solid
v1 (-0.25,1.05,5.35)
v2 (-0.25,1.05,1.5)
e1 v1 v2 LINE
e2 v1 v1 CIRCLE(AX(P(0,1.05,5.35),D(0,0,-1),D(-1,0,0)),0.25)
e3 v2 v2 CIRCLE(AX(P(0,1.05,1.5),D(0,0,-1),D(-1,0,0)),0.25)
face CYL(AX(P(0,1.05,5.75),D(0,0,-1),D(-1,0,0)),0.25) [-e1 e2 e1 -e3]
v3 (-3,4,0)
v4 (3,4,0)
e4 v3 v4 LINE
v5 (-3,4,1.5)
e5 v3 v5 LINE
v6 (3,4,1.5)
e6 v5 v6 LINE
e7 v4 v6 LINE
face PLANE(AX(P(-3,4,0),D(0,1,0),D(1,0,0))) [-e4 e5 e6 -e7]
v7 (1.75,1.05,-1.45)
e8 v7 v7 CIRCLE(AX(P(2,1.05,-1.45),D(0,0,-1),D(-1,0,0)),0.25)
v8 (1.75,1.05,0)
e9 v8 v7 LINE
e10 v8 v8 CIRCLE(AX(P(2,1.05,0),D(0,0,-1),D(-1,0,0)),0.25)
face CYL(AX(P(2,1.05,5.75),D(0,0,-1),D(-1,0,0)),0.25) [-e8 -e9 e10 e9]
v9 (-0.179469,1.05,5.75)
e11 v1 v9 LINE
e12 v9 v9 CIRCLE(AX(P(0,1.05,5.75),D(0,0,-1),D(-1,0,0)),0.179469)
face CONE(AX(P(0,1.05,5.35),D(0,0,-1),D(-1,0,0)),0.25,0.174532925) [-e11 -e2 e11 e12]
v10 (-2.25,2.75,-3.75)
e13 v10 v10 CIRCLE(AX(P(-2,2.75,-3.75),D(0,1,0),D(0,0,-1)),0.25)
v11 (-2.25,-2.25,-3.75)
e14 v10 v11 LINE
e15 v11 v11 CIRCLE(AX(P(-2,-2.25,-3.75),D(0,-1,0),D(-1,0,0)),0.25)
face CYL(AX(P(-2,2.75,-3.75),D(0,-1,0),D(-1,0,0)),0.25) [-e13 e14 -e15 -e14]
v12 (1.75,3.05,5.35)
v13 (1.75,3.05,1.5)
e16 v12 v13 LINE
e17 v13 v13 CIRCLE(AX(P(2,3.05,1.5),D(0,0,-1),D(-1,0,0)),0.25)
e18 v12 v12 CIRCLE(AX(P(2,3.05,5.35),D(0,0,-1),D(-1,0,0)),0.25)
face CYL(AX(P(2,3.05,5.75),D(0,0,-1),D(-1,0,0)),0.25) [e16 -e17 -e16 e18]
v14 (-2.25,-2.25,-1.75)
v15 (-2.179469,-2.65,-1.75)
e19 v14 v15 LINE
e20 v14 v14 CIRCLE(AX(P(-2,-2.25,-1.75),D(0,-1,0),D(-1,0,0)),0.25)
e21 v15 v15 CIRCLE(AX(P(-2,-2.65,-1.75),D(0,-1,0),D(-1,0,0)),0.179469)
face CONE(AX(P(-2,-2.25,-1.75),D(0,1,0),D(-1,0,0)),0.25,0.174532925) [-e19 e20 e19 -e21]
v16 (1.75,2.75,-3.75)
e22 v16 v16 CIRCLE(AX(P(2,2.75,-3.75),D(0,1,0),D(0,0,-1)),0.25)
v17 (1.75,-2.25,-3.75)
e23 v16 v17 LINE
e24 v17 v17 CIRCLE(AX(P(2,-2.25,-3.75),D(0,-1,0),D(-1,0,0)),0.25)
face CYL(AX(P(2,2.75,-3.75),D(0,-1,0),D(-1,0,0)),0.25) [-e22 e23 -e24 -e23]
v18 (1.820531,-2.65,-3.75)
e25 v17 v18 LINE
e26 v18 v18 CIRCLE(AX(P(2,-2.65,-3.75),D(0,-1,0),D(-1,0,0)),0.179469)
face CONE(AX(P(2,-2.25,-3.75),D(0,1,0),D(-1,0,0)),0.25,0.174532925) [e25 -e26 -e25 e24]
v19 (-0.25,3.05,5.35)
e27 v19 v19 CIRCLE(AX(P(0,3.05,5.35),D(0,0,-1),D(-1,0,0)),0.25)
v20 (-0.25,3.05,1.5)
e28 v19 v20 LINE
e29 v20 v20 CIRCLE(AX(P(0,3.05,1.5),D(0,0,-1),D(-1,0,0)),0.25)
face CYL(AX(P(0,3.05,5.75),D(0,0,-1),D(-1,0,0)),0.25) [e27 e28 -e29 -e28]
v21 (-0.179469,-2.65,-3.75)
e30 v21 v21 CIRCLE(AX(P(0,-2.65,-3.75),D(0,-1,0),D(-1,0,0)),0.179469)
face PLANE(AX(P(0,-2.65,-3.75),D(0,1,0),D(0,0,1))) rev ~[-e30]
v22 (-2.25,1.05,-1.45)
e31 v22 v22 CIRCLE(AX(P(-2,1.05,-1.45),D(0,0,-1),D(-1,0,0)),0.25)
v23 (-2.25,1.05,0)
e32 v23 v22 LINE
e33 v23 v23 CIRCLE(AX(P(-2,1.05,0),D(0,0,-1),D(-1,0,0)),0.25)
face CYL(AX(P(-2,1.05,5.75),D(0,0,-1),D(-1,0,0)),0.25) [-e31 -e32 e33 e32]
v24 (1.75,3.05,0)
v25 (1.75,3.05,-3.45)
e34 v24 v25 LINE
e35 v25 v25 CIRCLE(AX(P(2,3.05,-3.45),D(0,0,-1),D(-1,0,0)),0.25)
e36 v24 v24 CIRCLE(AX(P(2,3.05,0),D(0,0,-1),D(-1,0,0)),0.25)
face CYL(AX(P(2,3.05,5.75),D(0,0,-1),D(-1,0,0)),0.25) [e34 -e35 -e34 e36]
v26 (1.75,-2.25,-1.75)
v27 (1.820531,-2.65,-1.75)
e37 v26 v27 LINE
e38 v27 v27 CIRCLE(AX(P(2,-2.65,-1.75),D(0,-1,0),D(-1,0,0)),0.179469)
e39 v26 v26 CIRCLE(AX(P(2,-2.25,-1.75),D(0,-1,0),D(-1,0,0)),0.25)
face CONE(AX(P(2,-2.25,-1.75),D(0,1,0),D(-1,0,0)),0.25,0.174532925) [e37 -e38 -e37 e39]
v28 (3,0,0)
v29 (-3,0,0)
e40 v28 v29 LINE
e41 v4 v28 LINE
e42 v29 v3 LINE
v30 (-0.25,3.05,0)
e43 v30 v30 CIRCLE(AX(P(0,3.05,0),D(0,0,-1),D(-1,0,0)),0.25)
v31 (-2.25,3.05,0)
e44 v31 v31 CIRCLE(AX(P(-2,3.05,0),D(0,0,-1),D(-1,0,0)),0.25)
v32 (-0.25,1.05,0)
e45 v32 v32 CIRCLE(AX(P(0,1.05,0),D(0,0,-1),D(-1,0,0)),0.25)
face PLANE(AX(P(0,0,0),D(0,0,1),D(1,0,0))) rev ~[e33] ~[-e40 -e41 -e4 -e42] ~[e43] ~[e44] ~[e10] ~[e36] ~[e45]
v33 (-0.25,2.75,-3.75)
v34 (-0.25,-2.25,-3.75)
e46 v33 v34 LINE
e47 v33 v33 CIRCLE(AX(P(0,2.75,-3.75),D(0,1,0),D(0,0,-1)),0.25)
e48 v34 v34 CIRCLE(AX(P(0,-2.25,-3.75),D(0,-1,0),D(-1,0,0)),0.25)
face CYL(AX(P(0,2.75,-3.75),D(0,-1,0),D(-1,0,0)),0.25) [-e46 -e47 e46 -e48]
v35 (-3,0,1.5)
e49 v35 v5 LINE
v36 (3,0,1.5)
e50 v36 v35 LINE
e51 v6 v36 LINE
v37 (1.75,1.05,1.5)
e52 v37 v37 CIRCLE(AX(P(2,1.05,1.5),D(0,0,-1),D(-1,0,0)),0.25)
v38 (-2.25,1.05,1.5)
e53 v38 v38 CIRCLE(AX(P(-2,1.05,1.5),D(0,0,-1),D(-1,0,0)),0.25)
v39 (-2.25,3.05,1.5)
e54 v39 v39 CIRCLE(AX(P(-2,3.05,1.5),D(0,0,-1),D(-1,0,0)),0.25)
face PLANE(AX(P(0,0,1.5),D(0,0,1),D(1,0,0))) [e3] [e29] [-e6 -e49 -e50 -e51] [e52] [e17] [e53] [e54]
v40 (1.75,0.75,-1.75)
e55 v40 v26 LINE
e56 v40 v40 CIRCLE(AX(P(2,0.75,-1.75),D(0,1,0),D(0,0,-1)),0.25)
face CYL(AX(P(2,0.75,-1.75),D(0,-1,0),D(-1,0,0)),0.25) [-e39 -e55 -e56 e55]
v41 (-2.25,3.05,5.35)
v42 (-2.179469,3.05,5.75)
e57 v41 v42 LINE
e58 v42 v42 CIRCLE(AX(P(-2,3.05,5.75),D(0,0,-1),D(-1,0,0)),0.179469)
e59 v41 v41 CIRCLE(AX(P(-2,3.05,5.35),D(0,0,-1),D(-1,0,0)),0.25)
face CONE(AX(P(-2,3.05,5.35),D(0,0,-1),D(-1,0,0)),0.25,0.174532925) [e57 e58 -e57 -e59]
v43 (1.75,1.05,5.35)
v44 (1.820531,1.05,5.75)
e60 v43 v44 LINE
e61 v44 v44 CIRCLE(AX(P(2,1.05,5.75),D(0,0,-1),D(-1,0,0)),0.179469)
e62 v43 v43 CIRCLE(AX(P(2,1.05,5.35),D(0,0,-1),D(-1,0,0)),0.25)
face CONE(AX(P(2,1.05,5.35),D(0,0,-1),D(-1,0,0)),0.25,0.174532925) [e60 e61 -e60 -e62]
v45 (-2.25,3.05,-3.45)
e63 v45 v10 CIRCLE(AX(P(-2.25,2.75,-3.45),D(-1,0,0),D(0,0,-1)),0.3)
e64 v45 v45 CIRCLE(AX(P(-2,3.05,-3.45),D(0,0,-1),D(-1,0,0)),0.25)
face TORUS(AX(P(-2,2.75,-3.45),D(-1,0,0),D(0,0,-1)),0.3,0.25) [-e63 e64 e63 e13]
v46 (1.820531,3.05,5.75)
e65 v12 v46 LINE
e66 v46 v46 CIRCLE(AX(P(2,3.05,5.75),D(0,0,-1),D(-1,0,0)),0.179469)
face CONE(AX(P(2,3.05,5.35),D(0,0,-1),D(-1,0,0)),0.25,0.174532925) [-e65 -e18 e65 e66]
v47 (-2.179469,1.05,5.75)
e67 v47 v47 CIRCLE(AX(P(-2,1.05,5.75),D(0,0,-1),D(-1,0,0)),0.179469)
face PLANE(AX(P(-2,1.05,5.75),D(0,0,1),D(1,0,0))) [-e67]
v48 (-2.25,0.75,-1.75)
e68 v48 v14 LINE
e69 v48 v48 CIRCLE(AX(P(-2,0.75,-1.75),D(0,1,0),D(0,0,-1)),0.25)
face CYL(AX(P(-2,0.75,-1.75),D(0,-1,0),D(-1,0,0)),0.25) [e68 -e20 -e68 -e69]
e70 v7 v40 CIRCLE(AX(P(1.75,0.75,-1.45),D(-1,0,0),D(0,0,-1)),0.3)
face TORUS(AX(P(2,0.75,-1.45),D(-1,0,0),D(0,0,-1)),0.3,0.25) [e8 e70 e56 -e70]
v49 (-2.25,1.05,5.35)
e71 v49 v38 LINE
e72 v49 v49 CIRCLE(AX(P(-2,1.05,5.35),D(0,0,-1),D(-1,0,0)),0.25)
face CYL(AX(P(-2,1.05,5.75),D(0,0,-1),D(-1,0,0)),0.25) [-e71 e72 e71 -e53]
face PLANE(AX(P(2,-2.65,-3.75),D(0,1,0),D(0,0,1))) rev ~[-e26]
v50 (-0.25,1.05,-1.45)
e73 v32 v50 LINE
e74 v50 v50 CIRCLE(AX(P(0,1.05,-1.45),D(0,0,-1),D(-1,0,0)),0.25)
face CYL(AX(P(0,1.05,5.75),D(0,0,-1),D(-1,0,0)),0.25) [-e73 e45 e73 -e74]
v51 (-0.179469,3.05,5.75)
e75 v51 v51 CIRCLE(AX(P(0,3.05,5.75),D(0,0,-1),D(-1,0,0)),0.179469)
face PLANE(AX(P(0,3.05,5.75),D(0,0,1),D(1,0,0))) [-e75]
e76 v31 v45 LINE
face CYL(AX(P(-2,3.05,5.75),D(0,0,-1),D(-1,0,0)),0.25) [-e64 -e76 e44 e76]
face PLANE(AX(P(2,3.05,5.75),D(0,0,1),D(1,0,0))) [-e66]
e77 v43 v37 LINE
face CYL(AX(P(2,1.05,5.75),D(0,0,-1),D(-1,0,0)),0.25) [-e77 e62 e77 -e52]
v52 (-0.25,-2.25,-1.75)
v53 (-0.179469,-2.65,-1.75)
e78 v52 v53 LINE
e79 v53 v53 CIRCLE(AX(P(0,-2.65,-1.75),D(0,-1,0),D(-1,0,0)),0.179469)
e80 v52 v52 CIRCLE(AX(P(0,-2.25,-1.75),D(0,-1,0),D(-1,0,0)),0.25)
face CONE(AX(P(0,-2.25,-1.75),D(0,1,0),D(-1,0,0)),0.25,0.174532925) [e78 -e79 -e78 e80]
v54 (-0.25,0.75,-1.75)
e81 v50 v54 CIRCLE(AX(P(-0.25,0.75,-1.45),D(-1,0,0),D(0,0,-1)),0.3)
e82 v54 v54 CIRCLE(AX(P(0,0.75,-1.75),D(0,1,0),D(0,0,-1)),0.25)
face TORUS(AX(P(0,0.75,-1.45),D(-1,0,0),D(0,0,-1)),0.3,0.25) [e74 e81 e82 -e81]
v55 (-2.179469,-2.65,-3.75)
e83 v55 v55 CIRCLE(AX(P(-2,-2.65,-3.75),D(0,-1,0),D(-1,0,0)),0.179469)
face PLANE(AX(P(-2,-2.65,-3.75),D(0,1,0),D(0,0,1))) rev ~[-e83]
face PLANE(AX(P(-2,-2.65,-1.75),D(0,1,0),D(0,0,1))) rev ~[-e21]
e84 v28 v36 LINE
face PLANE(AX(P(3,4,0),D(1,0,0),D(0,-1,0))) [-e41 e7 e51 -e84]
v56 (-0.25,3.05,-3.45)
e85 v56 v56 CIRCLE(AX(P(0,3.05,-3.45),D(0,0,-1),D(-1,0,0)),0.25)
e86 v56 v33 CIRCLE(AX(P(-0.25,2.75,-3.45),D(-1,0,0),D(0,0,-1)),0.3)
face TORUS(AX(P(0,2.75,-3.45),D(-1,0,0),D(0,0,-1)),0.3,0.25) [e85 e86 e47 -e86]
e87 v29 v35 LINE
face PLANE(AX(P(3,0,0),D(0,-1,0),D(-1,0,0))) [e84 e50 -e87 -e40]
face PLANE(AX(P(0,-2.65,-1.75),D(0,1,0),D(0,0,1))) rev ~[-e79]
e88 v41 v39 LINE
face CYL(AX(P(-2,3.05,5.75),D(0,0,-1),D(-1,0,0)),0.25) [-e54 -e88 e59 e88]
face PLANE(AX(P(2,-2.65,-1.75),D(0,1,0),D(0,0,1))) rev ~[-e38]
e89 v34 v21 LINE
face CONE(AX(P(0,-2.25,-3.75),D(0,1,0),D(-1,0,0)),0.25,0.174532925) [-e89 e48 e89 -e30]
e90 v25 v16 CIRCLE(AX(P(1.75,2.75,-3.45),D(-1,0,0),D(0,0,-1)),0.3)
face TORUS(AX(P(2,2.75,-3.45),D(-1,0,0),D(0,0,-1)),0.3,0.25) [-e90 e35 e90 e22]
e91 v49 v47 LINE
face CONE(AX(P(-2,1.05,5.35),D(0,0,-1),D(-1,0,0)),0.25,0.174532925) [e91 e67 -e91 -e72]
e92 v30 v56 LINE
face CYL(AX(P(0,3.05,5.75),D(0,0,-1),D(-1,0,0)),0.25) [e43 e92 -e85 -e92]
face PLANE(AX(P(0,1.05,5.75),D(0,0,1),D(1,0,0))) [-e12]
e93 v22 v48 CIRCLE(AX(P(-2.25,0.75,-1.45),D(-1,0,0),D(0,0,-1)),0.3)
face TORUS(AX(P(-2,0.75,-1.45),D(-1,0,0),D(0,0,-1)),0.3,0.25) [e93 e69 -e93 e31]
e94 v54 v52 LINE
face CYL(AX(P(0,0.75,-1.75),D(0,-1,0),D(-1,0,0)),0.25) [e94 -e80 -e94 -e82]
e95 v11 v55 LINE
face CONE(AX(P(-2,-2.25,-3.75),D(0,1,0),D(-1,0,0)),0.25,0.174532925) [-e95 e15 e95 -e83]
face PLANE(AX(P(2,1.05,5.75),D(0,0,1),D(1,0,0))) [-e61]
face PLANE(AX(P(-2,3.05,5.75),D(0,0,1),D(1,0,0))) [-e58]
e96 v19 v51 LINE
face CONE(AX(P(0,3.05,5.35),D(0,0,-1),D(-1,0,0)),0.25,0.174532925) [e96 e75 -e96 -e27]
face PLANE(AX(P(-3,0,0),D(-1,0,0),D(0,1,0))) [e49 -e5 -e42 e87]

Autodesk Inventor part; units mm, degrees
ref_plane "YZ Plane" through (0, 0, 0) normal (1, 0, 0) x (0, 1, 0)
ref_plane "XZ Plane" through (0, 0, 0) normal (0, 1, 0) x (-1, 0, 0)
ref_plane "XY Plane" through (0, 0, 0) normal (0, 0, 1) x (1, 0, 0)
sketch "Sketch1" plane through (0, 0, 0) normal (0, 0, 1) x (1, 0, 0)
  line L0 (-3, 4) -> (3, 4)
  line L1 (3, 4) -> (3, 0)
  line L2 (3, 0) -> (-3, 0)
  line L3 (-3, 0) -> (-3, 4)
  point P0 (0, 0)
  dimension "d0" = 6
  dimension "d1" = 3
  dimension "d2" = 4
  dimension "d3" = 0
extrude "Extrusion1" add sketch "Sketch1" along normal blind 1.5
sketch "Sketch2" plane through (0, 0, 0) normal (1, 0, 0) x (0, 1, 0)
  line L0 (3.05, 5.75) -> (3.05, -3.45)
  line L1 (2.75, -3.75) -> (-2.65, -3.75)
  line L2 (1.05, 5.75) -> (1.05, -1.45)
  line L3 (0.75, -1.75) -> (-2.65, -1.75)
  line L4 (0, 1.5) -> (4, 1.5) projected
  line L5 (0, 0) -> (0, 1.5) projected
  arc A0 (0.75, -1.75) -> (1.05, -1.45) centre (0.75, -1.45) ccw
  arc A1 (2.75, -3.75) -> (3.05, -3.45) centre (2.75, -3.45) ccw
  dimension "d6" = 4.25
  dimension "d7" = 4.25
  dimension "d8" = 2.65
  dimension "d9" = 2.65
  dimension "d10" = 2
  dimension "d11" = 3.25
  dimension "d12" = 2
  dimension "d13" = 1.05
  dimension "d14" = 0.3
sketch "Sketch3" plane through (0, 0, 0) normal (0, 1, 0) x (-1, 0, 0)
  circle A0 centre (0, -3.75) radius 0.25
  line L0 (0, 0) -> (0, -0.006)
  line L1 (3, 0) -> (-3, 0) projected
  circle A1 centre (0, -1.75) radius 0.25
  line L2 (-3, 1.5) -> (3, 1.5) projected
  dimension "d16" = 3.25
  dimension "d17" = 2
  dimension "d18" = 0.5
  dimension "d19" = 0.5
sketch "Sketch4" plane through (0, 0, 0) normal (1, 0, 0) x (0, 1, 0)
  line L0 (3.05, 5.75) -> (3.05, -3.45)
  line L1 (2.75, -3.75) -> (-2.65, -3.75)
  line L2 (0, 0) -> (0, 1.5) projected
  line L3 (0, 1.5) -> (4, 1.5) projected
  arc A0 (2.75, -3.75) -> (3.05, -3.45) centre (2.75, -3.45) ccw
  dimension "d20" = 3.05
  dimension "d21" = 4.25
  dimension "d22" = 5.25
  dimension "d23" = 2.65
  dimension "d24" = 0.3
sketch "Sketch5" plane through (0, 0, 0) normal (0, 1, 0) x (-1, 0, 0)
  circle A0 centre (0, -3.75) radius 0.25
  line L0 (-3, 1.5) -> (3, 1.5) projected
  point P0 (0, 0)
  dimension "d25" = 5.25
  dimension "d26" = 0.5
sweep "Sweep1" add profiles "Sketch3" path "Sketch2" path curves L2 A0 L3 contours A1
sweep "Sweep2" add profiles "Sketch5" path "Sketch4" path curves L1 A0 L0
chamfer "Chamfer1" distance 0.4 angle 10 1 edges at (0.25, 3.05, 5.75) measured on face at (-0.2492, 3.0299, 4.3333)
chamfer "Chamfer2" distance 0.4 angle 10 1 edges at (0.25, 1.05, 5.75) measured on face at (-0.2492, 1.0299, 4.3333)
chamfer "Chamfer3" distance 0.4 angle 10 1 edges at (0.25, -2.65, -3.75) measured on face at (-0.2468, 0.95, -3.7901)
chamfer "Chamfer4" distance 0.4 angle 10 1 edges at (0.25, -2.65, -1.75) measured on face at (-0.2468, -0.3833, -1.7901)
pattern_linear "Rectangular Pattern1" count 3 spacing 2 along (-1, 0, 0) of "Sweep1", "Sweep2", "Chamfer1", "Chamfer2", "Chamfer3", "Chamfer4" first direction both ways yes
properties part number "conn_2x3_2mm_RA"
